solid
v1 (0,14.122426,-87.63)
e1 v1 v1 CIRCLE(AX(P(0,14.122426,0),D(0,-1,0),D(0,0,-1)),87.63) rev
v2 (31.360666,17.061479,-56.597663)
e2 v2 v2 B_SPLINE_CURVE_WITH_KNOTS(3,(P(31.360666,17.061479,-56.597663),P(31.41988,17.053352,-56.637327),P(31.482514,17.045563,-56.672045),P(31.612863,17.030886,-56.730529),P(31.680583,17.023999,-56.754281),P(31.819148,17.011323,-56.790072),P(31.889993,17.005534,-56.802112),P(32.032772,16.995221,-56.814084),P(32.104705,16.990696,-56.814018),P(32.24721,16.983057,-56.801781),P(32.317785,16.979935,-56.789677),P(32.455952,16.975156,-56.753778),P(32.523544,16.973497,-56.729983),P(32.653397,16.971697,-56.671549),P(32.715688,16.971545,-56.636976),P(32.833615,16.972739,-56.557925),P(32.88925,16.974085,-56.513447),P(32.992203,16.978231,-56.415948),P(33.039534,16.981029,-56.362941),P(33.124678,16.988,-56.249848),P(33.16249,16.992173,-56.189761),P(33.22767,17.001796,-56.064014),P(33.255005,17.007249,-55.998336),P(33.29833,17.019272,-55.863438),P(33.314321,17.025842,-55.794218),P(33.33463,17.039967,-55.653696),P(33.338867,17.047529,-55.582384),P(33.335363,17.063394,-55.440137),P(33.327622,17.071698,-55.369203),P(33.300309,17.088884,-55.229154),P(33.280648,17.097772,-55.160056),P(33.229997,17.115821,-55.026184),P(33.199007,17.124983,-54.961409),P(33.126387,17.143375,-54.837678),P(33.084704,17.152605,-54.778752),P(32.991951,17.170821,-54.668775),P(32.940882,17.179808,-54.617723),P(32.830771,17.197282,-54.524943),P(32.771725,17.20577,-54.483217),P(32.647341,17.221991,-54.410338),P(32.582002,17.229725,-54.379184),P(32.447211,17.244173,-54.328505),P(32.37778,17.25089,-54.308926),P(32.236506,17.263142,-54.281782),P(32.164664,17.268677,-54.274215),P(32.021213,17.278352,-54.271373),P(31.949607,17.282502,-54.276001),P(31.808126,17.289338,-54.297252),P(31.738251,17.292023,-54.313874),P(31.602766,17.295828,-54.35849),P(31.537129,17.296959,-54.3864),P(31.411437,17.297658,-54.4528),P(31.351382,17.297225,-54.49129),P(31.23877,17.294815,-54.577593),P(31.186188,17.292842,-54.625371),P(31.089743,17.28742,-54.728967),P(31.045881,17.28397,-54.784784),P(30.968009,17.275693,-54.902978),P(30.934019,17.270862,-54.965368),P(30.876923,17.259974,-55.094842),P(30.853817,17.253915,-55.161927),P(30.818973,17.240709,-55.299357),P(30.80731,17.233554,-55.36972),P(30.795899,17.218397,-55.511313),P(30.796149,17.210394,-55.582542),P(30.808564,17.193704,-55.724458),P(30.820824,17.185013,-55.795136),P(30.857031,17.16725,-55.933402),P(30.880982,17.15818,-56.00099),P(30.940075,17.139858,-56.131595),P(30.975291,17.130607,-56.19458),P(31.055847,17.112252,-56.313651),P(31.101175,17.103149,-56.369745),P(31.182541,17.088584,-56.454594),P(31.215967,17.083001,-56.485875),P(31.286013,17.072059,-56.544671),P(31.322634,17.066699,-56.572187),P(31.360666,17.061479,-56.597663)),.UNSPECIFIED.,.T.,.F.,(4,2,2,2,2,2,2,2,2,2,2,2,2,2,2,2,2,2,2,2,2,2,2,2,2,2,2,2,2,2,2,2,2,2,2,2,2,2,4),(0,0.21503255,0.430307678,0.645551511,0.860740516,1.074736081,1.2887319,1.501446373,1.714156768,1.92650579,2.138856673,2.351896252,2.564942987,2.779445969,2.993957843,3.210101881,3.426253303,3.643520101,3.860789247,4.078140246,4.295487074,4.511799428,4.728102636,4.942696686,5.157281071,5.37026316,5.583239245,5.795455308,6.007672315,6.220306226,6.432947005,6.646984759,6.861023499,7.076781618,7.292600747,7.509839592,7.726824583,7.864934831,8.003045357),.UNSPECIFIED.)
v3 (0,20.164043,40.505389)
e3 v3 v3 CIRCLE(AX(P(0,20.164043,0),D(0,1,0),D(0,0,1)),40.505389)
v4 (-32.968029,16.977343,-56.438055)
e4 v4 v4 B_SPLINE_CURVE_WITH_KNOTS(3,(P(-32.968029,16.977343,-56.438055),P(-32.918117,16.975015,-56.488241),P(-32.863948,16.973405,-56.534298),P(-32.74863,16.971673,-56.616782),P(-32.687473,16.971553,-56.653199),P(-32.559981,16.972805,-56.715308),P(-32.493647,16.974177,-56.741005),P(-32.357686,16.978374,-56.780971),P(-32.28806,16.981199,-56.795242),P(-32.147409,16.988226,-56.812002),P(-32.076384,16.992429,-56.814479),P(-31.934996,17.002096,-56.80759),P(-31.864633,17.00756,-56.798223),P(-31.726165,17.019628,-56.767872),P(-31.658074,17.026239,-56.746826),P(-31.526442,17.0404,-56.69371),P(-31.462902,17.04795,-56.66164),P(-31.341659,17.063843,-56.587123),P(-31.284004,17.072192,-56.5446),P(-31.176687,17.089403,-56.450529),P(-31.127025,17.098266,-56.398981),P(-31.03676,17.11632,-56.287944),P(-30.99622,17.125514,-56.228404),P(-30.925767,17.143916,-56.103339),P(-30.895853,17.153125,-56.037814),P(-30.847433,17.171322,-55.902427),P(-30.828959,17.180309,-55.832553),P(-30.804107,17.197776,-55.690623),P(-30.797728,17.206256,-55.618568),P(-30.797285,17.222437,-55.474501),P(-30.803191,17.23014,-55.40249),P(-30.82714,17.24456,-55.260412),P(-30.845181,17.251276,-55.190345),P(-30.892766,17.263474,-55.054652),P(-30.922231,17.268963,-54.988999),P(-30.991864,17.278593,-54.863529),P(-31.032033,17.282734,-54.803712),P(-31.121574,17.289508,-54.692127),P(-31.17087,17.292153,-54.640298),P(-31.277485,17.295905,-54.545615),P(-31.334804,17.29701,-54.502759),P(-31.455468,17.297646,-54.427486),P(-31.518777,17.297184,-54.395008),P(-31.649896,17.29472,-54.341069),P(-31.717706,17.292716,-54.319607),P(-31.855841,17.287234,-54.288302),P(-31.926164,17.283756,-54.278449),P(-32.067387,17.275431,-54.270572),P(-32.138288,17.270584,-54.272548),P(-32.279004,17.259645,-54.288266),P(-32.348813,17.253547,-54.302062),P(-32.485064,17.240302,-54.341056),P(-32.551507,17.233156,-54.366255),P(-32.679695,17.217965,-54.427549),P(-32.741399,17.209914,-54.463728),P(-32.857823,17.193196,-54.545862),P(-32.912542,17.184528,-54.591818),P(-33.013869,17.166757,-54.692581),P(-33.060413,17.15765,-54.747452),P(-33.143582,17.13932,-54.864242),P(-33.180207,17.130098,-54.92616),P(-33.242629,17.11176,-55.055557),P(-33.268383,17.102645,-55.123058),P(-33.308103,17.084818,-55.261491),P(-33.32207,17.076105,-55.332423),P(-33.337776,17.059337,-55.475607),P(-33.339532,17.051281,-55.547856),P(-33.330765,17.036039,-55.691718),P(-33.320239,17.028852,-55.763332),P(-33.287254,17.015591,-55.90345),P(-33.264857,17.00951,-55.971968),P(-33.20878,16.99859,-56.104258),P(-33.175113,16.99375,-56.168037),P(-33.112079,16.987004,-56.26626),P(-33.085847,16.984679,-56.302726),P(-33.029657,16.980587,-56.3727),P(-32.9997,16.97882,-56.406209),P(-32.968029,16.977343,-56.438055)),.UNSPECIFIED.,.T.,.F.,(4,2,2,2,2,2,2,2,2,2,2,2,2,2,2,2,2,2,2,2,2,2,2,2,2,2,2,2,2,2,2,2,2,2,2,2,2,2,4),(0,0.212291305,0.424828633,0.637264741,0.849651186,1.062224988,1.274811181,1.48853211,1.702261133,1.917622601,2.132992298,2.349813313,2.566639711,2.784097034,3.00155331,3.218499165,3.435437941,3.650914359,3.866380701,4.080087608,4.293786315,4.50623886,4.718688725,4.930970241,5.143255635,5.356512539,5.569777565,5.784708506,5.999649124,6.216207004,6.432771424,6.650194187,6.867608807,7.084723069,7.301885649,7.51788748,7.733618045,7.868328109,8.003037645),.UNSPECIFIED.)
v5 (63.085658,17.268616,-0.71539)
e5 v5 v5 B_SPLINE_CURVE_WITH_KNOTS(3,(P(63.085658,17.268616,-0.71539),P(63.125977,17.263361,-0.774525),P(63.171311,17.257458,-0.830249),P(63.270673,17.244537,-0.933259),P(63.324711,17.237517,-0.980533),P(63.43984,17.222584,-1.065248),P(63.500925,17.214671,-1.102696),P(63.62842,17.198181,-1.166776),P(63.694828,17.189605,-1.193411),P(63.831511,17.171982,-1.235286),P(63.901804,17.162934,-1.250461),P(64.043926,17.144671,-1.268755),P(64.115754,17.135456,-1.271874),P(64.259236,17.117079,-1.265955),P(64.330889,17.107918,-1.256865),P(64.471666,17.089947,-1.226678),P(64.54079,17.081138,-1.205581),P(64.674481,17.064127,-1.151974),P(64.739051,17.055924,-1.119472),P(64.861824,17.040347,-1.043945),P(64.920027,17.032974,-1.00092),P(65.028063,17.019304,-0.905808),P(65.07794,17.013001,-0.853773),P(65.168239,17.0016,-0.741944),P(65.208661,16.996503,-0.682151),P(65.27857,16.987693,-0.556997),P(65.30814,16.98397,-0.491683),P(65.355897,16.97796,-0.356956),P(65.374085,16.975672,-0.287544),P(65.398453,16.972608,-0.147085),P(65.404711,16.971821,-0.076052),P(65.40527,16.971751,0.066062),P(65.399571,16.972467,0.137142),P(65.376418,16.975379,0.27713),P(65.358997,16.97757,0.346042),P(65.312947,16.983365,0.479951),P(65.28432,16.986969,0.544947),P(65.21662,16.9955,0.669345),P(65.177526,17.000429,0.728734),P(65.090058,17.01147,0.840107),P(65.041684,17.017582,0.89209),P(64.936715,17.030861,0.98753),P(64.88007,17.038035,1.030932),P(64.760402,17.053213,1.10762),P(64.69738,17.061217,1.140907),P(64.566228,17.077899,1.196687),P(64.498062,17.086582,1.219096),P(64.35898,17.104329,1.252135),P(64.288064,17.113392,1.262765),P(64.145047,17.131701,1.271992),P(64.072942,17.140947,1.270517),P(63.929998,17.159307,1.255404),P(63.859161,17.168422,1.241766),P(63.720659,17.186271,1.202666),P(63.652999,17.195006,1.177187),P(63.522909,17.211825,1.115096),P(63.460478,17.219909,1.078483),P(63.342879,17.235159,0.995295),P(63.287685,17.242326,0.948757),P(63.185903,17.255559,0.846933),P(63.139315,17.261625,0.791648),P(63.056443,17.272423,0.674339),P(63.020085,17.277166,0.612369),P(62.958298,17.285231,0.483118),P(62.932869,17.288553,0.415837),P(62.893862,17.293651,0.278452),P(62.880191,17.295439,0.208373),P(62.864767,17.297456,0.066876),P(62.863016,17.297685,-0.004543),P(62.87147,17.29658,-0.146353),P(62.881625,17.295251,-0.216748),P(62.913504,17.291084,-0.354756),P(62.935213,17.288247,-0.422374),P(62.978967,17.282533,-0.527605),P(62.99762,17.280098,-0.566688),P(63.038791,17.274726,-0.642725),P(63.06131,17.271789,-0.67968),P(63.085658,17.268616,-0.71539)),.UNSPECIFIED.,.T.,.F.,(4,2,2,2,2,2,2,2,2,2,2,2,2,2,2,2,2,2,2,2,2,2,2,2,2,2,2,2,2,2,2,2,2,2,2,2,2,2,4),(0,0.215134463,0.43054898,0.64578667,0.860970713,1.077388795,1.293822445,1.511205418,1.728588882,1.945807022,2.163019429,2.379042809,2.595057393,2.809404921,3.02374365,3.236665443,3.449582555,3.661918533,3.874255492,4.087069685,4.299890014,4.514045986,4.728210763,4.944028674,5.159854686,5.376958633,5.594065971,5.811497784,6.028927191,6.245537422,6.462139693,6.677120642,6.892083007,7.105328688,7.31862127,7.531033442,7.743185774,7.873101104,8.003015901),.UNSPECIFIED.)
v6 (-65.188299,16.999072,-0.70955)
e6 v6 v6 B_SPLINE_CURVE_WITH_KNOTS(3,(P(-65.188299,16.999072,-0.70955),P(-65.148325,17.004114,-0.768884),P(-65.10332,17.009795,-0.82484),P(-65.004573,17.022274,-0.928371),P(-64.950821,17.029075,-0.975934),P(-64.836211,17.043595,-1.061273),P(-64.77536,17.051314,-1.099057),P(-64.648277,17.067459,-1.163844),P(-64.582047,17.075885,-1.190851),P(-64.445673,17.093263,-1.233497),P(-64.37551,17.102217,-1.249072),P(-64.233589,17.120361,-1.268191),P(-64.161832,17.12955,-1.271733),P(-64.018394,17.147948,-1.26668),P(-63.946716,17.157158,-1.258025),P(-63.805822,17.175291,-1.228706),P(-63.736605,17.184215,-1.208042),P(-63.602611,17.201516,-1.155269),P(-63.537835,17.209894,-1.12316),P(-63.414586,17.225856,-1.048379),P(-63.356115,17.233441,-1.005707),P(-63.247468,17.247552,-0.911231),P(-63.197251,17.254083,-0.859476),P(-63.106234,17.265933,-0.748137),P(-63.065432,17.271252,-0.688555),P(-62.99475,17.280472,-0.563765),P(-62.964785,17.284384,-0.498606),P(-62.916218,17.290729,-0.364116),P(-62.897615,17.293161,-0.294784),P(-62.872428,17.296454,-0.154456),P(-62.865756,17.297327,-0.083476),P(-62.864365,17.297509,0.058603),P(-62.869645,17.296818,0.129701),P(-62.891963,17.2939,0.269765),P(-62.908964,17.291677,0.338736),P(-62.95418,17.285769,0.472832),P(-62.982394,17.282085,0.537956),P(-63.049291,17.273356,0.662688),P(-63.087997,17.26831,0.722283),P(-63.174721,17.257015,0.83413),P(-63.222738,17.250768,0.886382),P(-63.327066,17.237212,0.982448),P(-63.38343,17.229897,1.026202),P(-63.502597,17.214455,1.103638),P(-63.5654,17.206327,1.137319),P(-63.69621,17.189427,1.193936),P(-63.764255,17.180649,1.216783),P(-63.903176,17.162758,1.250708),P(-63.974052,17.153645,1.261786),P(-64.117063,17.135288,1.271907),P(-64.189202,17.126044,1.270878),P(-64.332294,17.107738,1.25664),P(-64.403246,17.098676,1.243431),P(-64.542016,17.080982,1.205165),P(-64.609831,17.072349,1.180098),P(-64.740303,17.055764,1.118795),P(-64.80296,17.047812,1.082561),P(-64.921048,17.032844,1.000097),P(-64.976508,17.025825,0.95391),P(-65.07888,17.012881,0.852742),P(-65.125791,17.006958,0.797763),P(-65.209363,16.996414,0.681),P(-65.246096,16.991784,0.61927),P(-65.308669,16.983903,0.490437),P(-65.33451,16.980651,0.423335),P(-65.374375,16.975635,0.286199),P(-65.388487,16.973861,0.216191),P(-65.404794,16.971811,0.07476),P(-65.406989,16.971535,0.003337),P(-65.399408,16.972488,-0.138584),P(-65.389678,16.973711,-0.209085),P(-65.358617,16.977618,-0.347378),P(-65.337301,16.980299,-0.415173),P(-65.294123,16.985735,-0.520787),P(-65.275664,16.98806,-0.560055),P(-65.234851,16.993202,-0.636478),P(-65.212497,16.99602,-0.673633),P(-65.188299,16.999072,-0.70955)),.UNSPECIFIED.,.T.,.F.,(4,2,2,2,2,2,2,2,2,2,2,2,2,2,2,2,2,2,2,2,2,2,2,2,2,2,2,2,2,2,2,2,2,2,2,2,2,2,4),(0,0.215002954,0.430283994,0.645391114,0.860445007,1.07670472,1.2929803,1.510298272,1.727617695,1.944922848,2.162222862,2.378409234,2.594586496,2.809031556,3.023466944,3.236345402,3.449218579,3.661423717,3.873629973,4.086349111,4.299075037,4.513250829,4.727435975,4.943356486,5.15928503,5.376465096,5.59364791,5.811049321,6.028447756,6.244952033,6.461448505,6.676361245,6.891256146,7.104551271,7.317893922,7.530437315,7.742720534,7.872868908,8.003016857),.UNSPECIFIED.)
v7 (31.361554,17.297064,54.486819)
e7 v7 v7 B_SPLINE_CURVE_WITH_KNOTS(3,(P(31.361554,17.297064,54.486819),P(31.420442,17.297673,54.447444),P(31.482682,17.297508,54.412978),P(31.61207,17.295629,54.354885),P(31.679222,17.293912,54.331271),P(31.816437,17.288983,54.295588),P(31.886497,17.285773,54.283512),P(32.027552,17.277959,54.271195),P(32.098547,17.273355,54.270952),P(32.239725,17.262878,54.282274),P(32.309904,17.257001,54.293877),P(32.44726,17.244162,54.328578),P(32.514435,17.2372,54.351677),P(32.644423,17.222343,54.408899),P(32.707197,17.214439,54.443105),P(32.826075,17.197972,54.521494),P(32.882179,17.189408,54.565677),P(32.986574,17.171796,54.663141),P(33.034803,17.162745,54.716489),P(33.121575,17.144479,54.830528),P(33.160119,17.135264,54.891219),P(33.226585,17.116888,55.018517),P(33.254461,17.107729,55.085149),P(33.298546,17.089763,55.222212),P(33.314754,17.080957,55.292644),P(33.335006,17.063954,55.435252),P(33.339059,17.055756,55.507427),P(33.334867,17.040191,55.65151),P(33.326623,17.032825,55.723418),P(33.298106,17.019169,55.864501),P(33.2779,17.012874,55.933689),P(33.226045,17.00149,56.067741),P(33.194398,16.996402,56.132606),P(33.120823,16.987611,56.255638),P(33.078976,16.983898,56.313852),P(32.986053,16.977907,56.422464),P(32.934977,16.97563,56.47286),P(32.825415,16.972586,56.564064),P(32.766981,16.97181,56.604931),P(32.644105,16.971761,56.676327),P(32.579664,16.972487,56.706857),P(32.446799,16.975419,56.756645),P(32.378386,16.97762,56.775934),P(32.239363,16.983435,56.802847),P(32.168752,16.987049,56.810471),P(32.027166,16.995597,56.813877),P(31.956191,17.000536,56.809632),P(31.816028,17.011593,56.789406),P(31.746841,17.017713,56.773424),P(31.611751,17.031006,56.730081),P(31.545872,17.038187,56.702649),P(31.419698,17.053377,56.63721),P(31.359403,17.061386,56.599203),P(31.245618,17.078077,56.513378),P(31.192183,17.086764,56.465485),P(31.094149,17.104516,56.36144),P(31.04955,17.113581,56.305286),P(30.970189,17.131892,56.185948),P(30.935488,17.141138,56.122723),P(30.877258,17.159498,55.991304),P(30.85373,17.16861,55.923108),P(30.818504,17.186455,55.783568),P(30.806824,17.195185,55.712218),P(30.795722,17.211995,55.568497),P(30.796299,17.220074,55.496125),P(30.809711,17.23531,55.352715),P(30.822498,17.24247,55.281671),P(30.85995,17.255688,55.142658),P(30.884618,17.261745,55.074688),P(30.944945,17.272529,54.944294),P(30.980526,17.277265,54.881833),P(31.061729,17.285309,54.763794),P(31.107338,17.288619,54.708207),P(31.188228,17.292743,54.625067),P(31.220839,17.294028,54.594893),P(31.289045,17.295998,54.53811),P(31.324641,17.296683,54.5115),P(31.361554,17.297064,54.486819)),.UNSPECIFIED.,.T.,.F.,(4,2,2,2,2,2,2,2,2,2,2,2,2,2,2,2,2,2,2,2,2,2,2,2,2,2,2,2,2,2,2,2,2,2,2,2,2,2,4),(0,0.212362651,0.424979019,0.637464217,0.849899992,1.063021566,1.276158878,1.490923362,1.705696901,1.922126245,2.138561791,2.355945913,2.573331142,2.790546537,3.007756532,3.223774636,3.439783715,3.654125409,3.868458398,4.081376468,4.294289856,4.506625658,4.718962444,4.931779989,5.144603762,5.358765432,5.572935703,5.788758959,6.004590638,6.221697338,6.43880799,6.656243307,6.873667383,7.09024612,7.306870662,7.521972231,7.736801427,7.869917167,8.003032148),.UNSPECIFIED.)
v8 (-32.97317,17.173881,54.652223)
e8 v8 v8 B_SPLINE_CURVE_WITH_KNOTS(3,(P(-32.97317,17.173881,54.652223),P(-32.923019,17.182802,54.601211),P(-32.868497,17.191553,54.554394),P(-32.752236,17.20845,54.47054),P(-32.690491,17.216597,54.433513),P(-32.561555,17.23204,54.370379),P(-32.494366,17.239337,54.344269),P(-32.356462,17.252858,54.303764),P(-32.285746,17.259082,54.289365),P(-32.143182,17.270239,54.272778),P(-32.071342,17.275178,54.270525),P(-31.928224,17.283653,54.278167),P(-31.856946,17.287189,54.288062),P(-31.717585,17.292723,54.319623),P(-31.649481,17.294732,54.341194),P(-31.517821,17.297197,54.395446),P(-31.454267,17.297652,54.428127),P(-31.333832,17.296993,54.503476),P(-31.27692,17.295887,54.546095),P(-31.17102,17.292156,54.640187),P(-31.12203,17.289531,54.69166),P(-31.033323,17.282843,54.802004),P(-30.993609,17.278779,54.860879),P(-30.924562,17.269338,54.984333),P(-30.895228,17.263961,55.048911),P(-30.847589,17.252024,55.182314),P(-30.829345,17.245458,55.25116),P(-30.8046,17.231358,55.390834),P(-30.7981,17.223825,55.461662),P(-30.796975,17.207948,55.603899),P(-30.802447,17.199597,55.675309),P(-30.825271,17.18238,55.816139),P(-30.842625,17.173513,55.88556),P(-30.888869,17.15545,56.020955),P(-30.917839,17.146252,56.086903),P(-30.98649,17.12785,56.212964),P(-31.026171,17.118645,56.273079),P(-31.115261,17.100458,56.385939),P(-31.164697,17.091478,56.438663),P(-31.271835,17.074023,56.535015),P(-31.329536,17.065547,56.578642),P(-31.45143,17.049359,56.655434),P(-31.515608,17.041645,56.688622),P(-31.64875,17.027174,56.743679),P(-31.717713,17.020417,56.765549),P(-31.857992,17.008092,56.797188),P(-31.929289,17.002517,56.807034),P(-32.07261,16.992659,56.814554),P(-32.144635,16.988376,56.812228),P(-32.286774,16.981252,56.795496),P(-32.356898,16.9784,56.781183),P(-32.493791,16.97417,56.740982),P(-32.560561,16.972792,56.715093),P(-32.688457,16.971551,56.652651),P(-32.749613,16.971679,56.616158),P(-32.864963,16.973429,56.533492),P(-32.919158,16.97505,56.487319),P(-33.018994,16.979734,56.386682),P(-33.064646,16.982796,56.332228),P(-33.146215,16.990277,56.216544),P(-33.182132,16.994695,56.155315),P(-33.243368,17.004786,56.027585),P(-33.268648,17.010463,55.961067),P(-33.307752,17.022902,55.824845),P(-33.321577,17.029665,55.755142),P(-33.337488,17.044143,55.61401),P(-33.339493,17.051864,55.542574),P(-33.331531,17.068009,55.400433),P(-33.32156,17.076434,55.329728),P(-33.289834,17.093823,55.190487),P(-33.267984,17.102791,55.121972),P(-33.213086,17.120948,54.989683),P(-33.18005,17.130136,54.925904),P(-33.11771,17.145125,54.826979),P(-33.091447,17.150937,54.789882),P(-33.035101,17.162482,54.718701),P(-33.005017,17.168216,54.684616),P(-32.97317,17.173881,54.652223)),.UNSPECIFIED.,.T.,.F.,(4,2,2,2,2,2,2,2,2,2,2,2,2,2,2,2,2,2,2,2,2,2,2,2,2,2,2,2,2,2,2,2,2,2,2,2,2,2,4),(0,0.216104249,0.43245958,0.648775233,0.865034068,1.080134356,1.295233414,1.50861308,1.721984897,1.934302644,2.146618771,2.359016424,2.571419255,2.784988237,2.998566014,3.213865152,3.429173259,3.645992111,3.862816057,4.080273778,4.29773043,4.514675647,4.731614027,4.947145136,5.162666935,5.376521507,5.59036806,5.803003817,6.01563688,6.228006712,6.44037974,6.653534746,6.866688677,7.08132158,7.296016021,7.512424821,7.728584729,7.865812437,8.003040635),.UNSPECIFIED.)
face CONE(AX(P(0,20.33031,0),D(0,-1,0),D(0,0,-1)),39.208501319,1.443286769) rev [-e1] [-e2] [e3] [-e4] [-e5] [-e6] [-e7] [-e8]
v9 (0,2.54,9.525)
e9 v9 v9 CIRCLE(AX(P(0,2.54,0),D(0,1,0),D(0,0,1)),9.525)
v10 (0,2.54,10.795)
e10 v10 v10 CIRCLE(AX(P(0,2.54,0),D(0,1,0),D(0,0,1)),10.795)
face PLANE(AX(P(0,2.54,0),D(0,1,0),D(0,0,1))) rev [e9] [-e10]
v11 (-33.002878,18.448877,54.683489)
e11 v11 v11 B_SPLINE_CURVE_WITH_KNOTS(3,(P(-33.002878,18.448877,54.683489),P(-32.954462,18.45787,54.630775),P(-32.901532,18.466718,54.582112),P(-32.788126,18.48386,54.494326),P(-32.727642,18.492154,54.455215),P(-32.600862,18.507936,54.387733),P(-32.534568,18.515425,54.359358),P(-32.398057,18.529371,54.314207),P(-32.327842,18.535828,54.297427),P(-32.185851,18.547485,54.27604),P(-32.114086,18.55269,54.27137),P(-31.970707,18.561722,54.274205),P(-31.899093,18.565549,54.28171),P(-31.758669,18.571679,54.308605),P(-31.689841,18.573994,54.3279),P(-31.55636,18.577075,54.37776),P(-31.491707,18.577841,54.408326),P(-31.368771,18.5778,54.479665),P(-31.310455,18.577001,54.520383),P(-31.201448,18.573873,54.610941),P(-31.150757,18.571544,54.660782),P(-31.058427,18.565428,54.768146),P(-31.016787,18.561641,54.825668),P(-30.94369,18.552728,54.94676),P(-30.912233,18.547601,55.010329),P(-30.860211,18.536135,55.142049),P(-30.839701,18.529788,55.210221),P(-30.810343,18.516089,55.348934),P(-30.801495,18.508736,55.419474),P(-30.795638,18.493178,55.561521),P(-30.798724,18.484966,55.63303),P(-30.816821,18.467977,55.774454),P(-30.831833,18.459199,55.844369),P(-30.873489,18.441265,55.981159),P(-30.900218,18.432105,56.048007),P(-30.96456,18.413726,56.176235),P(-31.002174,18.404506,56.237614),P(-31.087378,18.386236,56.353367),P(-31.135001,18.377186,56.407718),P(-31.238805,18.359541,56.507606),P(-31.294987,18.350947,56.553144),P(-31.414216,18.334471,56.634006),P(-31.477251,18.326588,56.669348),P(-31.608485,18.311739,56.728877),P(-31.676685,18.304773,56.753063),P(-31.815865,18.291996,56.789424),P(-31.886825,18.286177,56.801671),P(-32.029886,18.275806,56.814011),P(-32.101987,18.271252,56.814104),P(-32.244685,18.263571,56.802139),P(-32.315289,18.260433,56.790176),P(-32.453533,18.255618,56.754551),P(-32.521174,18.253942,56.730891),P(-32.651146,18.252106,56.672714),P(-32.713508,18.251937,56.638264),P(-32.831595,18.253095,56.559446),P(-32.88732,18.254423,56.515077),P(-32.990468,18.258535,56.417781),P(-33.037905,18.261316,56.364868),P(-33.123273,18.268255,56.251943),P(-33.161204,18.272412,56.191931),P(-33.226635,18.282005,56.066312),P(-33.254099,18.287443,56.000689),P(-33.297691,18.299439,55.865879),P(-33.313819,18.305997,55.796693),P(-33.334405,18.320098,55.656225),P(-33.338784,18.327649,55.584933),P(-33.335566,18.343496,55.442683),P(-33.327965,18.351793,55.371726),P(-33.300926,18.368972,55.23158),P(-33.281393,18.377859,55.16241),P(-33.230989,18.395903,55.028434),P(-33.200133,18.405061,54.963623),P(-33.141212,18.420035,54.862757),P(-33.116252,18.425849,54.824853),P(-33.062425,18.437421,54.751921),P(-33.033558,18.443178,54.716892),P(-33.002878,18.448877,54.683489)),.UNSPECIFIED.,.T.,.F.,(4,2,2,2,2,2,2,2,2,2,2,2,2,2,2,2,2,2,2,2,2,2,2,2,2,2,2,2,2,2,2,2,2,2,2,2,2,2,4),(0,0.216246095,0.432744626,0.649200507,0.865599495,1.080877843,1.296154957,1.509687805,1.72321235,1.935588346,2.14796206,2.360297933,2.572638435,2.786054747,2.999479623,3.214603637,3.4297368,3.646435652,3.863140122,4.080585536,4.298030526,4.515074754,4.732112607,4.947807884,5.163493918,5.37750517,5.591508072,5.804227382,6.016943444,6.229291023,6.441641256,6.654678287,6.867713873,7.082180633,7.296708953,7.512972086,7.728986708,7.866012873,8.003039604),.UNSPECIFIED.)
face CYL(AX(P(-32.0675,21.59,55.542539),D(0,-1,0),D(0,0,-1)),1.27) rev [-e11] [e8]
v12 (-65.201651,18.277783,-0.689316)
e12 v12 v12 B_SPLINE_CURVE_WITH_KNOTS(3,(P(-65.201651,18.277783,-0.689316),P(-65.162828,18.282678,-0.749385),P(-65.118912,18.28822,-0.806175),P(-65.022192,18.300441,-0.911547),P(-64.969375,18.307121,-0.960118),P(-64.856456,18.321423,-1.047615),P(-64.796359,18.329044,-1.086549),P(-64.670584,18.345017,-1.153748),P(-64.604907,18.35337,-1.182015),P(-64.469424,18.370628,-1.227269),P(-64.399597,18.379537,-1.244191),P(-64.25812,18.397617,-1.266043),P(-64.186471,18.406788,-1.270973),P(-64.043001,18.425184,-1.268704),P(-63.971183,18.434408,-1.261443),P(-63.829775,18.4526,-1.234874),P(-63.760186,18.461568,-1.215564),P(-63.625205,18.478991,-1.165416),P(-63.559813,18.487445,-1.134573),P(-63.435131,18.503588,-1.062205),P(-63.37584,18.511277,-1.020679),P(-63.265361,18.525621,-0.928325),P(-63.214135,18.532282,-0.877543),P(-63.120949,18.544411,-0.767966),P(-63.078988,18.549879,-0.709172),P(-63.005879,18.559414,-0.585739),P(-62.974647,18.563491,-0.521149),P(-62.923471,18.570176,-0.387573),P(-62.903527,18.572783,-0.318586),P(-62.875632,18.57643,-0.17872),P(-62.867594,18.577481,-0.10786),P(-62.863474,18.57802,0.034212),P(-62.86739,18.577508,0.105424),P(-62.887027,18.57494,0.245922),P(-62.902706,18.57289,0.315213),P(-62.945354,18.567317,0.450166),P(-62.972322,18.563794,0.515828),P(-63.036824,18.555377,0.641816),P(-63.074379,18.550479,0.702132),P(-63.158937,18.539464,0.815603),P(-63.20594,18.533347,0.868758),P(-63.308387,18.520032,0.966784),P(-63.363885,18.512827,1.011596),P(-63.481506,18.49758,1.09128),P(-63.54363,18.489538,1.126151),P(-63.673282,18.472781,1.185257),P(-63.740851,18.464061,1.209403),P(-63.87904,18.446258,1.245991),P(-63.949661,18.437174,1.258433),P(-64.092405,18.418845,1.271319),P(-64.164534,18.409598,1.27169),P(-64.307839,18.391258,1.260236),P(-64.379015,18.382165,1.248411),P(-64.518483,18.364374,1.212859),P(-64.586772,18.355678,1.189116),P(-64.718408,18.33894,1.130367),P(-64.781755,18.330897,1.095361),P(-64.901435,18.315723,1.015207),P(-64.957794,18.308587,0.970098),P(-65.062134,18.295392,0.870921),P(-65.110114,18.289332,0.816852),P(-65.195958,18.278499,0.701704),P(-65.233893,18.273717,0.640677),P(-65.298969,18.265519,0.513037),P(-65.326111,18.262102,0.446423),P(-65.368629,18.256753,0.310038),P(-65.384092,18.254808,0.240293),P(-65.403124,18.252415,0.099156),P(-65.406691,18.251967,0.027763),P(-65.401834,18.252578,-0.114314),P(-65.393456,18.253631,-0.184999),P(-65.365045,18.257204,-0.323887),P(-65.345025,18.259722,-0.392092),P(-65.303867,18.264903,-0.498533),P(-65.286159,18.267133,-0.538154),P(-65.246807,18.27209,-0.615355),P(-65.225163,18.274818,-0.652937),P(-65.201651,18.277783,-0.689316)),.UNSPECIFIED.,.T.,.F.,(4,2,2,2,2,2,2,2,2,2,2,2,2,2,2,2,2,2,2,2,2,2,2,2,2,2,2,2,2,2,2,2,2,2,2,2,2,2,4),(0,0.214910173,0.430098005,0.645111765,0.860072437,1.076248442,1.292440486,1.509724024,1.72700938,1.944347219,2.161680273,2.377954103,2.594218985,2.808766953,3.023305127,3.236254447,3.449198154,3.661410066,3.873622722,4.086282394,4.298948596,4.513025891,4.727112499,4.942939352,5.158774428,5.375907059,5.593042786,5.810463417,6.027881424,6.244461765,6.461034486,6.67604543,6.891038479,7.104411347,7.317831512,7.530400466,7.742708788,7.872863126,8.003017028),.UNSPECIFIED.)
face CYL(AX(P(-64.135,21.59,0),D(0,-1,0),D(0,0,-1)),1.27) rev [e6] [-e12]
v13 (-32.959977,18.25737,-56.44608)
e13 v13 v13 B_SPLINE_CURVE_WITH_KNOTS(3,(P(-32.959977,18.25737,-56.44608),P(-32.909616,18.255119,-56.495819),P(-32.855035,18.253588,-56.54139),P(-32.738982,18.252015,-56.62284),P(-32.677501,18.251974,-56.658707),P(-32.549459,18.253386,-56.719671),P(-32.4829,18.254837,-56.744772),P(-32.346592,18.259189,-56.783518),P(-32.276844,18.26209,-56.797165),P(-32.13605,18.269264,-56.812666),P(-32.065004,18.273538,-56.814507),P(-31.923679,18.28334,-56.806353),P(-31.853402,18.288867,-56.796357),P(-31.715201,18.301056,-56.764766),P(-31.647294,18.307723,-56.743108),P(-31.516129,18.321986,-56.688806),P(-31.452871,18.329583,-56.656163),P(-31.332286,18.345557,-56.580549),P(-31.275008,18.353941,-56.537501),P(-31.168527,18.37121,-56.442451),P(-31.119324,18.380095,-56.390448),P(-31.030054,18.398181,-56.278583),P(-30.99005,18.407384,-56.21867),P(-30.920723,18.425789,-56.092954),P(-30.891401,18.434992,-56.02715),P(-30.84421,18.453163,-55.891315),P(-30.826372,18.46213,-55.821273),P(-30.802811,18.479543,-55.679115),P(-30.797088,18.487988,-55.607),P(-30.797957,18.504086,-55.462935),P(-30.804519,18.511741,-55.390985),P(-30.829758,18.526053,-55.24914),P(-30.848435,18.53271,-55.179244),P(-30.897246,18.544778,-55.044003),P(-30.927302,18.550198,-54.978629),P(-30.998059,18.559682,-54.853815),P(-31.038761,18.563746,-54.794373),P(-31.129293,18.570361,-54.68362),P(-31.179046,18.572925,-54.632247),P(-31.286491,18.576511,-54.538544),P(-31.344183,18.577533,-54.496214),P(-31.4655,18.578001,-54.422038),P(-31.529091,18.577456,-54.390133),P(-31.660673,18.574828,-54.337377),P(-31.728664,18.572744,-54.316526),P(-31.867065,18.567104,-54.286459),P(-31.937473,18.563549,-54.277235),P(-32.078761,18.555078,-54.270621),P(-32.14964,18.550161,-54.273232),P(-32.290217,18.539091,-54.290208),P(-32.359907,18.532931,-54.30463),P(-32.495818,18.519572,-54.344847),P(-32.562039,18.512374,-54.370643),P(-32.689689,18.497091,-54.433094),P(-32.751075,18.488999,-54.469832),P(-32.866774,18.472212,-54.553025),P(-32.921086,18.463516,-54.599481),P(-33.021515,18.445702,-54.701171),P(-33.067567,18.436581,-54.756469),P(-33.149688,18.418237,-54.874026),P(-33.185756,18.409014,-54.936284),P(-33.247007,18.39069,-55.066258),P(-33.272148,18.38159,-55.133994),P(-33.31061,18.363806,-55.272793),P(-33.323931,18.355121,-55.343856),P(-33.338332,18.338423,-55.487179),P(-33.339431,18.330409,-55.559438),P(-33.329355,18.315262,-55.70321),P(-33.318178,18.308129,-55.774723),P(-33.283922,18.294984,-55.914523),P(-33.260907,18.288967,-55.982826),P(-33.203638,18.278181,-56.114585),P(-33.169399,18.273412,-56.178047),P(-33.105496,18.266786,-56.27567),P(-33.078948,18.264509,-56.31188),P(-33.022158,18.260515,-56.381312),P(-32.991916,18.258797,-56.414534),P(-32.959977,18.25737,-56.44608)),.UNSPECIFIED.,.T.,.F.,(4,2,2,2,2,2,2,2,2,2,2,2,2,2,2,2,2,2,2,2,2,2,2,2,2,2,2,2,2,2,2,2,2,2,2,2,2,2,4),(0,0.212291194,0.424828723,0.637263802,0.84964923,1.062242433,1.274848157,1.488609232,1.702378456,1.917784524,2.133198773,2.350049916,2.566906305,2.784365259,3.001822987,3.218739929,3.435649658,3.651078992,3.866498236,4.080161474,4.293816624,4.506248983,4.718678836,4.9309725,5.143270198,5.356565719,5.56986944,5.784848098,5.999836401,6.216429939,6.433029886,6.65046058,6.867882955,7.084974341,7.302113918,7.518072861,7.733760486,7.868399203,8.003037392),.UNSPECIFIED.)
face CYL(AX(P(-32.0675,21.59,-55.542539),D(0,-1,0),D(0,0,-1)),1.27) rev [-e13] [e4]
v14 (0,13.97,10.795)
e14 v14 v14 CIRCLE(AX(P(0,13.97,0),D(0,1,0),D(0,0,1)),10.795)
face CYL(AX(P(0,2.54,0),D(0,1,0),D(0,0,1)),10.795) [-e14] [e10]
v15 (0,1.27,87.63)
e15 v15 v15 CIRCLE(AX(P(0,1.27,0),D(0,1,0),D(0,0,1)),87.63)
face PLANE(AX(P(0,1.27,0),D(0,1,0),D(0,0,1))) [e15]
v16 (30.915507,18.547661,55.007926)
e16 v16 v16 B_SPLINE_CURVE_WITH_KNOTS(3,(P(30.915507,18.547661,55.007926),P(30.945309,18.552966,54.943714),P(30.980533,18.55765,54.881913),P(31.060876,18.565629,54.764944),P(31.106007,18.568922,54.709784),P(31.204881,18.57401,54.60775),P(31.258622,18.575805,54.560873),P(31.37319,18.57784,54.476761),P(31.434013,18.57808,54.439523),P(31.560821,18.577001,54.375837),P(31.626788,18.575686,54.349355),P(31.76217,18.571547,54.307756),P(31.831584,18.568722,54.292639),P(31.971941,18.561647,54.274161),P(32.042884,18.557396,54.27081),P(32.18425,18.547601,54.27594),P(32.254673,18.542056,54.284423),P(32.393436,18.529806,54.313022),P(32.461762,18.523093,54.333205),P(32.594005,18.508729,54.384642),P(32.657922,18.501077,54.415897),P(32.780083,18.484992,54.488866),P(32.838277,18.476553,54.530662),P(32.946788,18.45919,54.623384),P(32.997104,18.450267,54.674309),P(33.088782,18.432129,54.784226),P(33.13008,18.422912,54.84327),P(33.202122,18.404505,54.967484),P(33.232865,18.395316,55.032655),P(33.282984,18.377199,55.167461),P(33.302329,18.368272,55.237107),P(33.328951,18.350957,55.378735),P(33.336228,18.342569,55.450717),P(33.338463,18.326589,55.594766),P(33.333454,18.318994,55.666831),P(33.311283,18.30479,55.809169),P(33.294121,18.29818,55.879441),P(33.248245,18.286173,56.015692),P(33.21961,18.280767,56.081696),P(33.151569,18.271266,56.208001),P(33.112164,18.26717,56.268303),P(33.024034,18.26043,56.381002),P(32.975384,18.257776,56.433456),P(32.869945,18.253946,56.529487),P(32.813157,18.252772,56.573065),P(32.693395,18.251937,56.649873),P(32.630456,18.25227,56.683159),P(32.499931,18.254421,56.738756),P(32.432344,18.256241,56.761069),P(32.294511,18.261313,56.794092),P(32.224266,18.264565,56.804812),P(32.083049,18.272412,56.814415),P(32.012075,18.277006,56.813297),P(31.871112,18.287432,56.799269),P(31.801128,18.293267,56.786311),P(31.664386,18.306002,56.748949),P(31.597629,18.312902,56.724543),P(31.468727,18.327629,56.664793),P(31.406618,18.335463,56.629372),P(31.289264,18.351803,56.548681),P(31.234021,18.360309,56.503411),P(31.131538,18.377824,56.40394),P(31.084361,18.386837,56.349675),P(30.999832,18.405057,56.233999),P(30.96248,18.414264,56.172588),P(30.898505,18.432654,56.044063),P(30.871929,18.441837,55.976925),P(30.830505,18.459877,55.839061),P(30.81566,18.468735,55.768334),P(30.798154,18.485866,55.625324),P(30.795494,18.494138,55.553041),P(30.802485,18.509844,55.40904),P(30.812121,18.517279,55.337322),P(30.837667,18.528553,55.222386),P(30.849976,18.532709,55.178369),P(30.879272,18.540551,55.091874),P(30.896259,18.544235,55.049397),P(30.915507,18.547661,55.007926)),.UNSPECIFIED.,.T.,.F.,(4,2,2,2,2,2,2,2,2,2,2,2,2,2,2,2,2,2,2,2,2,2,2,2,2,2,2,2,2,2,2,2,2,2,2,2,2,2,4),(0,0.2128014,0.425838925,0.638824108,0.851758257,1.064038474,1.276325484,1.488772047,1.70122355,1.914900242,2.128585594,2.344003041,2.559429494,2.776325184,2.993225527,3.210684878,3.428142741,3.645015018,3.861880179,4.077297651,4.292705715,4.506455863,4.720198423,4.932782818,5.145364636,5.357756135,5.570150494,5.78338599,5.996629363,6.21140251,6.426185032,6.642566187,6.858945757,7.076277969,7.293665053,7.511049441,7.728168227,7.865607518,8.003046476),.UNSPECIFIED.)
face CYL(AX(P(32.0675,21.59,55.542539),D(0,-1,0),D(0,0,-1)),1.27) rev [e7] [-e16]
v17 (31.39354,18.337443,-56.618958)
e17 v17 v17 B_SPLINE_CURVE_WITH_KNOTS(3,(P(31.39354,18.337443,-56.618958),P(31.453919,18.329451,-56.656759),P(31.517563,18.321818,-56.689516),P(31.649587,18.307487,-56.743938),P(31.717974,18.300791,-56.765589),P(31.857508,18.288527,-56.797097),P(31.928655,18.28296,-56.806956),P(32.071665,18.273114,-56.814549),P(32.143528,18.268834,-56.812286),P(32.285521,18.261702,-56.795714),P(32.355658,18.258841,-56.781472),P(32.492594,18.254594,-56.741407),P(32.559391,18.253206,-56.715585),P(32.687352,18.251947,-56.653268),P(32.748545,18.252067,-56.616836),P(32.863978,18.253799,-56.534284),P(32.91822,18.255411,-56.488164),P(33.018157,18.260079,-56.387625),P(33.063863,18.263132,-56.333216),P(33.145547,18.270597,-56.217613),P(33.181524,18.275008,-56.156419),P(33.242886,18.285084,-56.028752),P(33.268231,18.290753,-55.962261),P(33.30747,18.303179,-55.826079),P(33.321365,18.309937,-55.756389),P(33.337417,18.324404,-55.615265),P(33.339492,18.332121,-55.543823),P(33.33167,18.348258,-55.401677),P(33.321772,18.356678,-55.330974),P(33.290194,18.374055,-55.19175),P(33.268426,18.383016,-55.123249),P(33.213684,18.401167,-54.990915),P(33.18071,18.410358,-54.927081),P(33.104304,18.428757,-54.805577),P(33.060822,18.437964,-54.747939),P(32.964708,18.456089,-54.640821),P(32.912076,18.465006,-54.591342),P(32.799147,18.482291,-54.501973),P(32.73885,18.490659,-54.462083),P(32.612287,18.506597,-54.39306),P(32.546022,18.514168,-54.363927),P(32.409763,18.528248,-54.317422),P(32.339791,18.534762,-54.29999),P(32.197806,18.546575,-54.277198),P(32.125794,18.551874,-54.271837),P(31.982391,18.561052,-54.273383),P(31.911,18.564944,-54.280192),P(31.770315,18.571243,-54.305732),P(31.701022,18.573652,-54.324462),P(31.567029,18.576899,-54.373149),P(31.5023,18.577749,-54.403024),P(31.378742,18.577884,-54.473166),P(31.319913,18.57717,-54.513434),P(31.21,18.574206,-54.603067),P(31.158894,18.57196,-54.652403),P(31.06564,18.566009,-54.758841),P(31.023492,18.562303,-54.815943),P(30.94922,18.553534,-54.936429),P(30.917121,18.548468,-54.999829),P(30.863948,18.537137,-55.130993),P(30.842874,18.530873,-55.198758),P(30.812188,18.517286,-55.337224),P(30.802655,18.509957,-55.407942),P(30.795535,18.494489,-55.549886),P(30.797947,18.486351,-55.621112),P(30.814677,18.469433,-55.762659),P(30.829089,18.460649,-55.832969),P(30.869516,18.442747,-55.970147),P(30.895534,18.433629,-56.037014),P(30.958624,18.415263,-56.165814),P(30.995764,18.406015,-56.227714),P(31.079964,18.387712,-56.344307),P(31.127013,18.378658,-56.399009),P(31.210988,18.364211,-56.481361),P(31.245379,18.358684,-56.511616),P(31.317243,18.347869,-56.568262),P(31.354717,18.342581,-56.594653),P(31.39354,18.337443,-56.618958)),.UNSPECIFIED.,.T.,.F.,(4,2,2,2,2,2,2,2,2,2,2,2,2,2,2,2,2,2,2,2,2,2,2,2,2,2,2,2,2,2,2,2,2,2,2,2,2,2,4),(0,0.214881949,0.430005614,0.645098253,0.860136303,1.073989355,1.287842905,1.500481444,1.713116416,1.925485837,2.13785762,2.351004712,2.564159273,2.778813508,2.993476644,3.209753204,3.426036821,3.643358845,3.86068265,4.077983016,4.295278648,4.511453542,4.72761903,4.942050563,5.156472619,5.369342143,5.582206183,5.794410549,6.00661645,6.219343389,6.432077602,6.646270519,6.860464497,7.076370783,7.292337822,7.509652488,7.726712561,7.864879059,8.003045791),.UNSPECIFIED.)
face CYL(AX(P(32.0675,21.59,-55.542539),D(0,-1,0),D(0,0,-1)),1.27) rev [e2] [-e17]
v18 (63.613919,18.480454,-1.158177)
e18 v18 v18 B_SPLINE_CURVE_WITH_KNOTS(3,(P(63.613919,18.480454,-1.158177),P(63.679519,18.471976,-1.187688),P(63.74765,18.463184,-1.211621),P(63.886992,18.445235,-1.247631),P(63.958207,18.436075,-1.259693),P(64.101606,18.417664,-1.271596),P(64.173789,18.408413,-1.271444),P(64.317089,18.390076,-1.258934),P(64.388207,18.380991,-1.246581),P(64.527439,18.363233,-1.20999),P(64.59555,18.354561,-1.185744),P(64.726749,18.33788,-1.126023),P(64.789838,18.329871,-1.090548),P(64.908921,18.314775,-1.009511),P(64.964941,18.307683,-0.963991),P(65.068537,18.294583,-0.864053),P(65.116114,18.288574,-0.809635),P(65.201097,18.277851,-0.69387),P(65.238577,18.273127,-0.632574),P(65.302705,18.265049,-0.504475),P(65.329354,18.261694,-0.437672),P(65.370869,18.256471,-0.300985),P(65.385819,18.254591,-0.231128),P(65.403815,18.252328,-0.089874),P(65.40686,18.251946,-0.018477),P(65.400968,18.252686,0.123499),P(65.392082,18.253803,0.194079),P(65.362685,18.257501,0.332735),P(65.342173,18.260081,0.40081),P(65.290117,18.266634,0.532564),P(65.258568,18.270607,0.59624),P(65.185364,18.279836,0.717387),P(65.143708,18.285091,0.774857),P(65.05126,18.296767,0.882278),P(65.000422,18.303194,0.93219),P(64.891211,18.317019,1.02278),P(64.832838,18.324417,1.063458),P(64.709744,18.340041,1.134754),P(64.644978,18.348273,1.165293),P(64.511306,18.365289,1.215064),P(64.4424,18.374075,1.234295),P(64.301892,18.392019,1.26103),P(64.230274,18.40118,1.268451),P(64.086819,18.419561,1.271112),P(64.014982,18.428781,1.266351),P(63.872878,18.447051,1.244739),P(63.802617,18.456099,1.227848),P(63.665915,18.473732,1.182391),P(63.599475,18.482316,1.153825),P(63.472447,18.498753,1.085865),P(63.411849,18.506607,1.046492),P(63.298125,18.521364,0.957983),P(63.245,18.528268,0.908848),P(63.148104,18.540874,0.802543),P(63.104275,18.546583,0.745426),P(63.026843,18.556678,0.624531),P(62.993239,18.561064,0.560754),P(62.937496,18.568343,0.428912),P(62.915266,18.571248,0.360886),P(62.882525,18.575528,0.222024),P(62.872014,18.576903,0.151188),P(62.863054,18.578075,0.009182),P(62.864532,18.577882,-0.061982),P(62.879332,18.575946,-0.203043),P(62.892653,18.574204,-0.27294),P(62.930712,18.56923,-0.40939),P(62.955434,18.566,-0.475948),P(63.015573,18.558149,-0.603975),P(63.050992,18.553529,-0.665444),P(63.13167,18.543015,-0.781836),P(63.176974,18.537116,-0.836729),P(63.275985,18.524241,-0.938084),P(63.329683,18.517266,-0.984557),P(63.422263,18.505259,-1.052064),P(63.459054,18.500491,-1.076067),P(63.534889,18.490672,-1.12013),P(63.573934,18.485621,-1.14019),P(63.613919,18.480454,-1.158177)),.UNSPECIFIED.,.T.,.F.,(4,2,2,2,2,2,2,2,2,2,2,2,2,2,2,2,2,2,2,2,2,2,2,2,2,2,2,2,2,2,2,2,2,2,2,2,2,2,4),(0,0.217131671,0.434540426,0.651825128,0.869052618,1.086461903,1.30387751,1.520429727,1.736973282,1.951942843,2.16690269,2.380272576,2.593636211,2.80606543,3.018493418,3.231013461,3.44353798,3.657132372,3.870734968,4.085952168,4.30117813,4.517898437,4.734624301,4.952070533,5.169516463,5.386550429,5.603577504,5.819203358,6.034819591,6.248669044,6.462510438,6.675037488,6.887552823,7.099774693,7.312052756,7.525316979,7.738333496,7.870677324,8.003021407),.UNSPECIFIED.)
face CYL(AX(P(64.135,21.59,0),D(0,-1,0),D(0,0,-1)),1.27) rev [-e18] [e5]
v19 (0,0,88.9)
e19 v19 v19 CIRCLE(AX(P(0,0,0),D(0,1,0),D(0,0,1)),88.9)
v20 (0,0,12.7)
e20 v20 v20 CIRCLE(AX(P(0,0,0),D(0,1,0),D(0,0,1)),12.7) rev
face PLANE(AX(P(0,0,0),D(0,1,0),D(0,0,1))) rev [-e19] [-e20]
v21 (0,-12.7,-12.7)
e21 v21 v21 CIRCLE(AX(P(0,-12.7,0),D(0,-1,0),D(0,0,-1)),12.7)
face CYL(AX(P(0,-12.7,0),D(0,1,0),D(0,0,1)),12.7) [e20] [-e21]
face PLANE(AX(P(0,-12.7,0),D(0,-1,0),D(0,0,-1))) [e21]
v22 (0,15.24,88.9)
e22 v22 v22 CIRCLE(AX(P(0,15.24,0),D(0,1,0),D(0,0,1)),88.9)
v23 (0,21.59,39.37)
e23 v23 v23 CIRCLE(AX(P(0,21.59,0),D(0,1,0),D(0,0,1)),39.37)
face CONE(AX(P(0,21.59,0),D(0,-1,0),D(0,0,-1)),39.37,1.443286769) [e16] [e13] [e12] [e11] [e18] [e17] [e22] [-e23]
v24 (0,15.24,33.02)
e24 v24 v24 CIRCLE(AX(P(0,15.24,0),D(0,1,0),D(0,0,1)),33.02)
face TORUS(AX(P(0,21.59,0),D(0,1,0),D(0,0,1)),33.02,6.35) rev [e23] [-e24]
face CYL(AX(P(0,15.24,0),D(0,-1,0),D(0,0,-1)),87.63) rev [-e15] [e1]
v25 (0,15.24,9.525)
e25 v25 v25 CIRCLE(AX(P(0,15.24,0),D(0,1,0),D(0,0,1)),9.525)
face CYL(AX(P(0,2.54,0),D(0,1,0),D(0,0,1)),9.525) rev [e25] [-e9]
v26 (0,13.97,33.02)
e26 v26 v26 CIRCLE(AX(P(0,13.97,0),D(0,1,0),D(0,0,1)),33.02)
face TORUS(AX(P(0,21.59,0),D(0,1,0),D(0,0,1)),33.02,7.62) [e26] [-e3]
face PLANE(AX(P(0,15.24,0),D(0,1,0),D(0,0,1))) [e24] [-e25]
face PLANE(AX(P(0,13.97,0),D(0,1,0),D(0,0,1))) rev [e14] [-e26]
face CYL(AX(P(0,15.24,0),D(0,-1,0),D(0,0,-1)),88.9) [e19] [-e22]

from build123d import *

# Parameters (mm, degrees)
SKETCH1_R           = 88.9
BOSS_EXTRUDE1_DEPTH = 15.24
SKETCH2_R           = 39.37
BOSS_EXTRUDE2_DEPTH = 6.35
SKETCH4_R           = 39.37
CUT_EXTRUDE1_DEPTH  = 6.35
FILLET1_R           = 6.35
SKETCH5_R           = 9.525
CUT_EXTRUDE2_DEPTH  = 12.7
SKETCH8_R           = 1.27
CUT_EXTRUDE3_DEPTH  = 6.35
CIRPATTERN1_COUNT   = 6
SKETCH9_R           = 12.7
BOSS_EXTRUDE3_DEPTH = 12.7


# Read off the part's stored shape, not the designer's step: Shell1
with BuildPart() as part:
    # Sketch1 → Boss-Extrude1 (new body)
    with BuildSketch(Plane(origin=(0, 0, 0), x_dir=(1, 0, 0), z_dir=(0, 1, 0))):
        with Locations(Location((0, 0, 0), (0, 0, 270))):
            Circle(SKETCH1_R)
    extrude(amount=BOSS_EXTRUDE1_DEPTH)

    # Sketch2 → Boss-Extrude2 (add)
    with BuildSketch(Plane(origin=(0, 15.24, 0), x_dir=(1, 0, 0), z_dir=(0, 1, 0))):
        with Locations(Location((0, 0, 0), (0, 0, 270))):
            Circle(SKETCH2_R)
    extrude(amount=BOSS_EXTRUDE2_DEPTH)

    # Sketch3 → Revolve1 (revolve)
    with BuildSketch(Plane(origin=(0, 0, 0), x_dir=(0, 0, -1), z_dir=(1, 0, 0)), mode=Mode.PRIVATE) as revolve1_sk:
        Polygon((-39.37, 21.59), (-39.37, 15.24), (-88.9, 15.24), align=None)
    revolve(revolve1_sk.sketch.rotate(Axis((0, 0, 0), (0, 1, 0)), 180), axis=Axis((0, 0, 0), (0, 1, 0)))

    # Sketch4 → Cut-Extrude1 (cut)
    with BuildSketch(Plane(origin=(0, 21.59, 0), x_dir=(1, 0, 0), z_dir=(0, 1, 0))):
        with Locations(Location((0, 0, 0), (0, 0, 270))):
            Circle(SKETCH4_R)
    extrude(amount=-CUT_EXTRUDE1_DEPTH, mode=Mode.SUBTRACT)

    # Fillet1
    fillet1_edges = [part.edges().sort_by_distance(p)[0] for p in [
        (0, 15.24, -39.37),
    ]]
    fillet(fillet1_edges, radius=FILLET1_R - 0.0001)  # a hair under: the kernel refuses the full size

    # Sketch5 → Cut-Extrude2 (cut)
    with BuildSketch(Plane(origin=(0, 15.24, 0), x_dir=(1, 0, 0), z_dir=(0, 1, 0))):
        with Locations(Location((0, 0, 0), (0, 0, 270))):
            Circle(SKETCH5_R)
    extrude(amount=-CUT_EXTRUDE2_DEPTH, mode=Mode.SUBTRACT)

    # Shell1 outline → Shell1 (revolve, cut)
    with BuildSketch(Plane.XY):
        with BuildLine():
            Line((87.63, 14.12242584), (40.505388812, 20.164042659))
            ThreePointArc((40.505388812, 20.164042659), (37.877911334, 15.71930179), (33.02, 13.97))
            Line((33.02, 13.97), (10.795, 13.97))
            Line((10.795, 13.97), (10.795, 2.54))
            Line((10.795, 2.54), (0, 2.54))
            Line((0, 2.54), (0, 1.27))
            Line((0, 1.27), (87.63, 1.27))
            Line((87.63, 1.27), (87.63, 14.12242584))
        make_face()
    revolve(axis=Axis((0, 0, 0), (0, 1, 0)), mode=Mode.SUBTRACT)

    # Sketch8 → Cut-Extrude3 (cut)
    with BuildSketch(Plane(origin=(0, 15.24, 0), x_dir=(-1, 0, 0), z_dir=(0, -1, 0))):
        with Locations(Location((-64.135, 0, 0), (0, 0, 65.776295288))):
            Circle(SKETCH8_R)
    cut_extrude3 = extrude(amount=-CUT_EXTRUDE3_DEPTH, mode=Mode.SUBTRACT)

    # CirPattern1: Cut-Extrude3 ×6 about axis
    cirpattern1_axis = Axis((0, 0, 0), (0, 1, 0))
    for i in range(1, CIRPATTERN1_COUNT):
        add(cut_extrude3.rotate(cirpattern1_axis, i * 360 / CIRPATTERN1_COUNT), mode=Mode.SUBTRACT)

    # Sketch9 → Boss-Extrude3 (add)
    with BuildSketch(Plane.XZ):
        with Locations(Location((0, 0, 0), (0, 0, 90))):
            Circle(SKETCH9_R)
    extrude(amount=BOSS_EXTRUDE3_DEPTH)


solid = part.part
